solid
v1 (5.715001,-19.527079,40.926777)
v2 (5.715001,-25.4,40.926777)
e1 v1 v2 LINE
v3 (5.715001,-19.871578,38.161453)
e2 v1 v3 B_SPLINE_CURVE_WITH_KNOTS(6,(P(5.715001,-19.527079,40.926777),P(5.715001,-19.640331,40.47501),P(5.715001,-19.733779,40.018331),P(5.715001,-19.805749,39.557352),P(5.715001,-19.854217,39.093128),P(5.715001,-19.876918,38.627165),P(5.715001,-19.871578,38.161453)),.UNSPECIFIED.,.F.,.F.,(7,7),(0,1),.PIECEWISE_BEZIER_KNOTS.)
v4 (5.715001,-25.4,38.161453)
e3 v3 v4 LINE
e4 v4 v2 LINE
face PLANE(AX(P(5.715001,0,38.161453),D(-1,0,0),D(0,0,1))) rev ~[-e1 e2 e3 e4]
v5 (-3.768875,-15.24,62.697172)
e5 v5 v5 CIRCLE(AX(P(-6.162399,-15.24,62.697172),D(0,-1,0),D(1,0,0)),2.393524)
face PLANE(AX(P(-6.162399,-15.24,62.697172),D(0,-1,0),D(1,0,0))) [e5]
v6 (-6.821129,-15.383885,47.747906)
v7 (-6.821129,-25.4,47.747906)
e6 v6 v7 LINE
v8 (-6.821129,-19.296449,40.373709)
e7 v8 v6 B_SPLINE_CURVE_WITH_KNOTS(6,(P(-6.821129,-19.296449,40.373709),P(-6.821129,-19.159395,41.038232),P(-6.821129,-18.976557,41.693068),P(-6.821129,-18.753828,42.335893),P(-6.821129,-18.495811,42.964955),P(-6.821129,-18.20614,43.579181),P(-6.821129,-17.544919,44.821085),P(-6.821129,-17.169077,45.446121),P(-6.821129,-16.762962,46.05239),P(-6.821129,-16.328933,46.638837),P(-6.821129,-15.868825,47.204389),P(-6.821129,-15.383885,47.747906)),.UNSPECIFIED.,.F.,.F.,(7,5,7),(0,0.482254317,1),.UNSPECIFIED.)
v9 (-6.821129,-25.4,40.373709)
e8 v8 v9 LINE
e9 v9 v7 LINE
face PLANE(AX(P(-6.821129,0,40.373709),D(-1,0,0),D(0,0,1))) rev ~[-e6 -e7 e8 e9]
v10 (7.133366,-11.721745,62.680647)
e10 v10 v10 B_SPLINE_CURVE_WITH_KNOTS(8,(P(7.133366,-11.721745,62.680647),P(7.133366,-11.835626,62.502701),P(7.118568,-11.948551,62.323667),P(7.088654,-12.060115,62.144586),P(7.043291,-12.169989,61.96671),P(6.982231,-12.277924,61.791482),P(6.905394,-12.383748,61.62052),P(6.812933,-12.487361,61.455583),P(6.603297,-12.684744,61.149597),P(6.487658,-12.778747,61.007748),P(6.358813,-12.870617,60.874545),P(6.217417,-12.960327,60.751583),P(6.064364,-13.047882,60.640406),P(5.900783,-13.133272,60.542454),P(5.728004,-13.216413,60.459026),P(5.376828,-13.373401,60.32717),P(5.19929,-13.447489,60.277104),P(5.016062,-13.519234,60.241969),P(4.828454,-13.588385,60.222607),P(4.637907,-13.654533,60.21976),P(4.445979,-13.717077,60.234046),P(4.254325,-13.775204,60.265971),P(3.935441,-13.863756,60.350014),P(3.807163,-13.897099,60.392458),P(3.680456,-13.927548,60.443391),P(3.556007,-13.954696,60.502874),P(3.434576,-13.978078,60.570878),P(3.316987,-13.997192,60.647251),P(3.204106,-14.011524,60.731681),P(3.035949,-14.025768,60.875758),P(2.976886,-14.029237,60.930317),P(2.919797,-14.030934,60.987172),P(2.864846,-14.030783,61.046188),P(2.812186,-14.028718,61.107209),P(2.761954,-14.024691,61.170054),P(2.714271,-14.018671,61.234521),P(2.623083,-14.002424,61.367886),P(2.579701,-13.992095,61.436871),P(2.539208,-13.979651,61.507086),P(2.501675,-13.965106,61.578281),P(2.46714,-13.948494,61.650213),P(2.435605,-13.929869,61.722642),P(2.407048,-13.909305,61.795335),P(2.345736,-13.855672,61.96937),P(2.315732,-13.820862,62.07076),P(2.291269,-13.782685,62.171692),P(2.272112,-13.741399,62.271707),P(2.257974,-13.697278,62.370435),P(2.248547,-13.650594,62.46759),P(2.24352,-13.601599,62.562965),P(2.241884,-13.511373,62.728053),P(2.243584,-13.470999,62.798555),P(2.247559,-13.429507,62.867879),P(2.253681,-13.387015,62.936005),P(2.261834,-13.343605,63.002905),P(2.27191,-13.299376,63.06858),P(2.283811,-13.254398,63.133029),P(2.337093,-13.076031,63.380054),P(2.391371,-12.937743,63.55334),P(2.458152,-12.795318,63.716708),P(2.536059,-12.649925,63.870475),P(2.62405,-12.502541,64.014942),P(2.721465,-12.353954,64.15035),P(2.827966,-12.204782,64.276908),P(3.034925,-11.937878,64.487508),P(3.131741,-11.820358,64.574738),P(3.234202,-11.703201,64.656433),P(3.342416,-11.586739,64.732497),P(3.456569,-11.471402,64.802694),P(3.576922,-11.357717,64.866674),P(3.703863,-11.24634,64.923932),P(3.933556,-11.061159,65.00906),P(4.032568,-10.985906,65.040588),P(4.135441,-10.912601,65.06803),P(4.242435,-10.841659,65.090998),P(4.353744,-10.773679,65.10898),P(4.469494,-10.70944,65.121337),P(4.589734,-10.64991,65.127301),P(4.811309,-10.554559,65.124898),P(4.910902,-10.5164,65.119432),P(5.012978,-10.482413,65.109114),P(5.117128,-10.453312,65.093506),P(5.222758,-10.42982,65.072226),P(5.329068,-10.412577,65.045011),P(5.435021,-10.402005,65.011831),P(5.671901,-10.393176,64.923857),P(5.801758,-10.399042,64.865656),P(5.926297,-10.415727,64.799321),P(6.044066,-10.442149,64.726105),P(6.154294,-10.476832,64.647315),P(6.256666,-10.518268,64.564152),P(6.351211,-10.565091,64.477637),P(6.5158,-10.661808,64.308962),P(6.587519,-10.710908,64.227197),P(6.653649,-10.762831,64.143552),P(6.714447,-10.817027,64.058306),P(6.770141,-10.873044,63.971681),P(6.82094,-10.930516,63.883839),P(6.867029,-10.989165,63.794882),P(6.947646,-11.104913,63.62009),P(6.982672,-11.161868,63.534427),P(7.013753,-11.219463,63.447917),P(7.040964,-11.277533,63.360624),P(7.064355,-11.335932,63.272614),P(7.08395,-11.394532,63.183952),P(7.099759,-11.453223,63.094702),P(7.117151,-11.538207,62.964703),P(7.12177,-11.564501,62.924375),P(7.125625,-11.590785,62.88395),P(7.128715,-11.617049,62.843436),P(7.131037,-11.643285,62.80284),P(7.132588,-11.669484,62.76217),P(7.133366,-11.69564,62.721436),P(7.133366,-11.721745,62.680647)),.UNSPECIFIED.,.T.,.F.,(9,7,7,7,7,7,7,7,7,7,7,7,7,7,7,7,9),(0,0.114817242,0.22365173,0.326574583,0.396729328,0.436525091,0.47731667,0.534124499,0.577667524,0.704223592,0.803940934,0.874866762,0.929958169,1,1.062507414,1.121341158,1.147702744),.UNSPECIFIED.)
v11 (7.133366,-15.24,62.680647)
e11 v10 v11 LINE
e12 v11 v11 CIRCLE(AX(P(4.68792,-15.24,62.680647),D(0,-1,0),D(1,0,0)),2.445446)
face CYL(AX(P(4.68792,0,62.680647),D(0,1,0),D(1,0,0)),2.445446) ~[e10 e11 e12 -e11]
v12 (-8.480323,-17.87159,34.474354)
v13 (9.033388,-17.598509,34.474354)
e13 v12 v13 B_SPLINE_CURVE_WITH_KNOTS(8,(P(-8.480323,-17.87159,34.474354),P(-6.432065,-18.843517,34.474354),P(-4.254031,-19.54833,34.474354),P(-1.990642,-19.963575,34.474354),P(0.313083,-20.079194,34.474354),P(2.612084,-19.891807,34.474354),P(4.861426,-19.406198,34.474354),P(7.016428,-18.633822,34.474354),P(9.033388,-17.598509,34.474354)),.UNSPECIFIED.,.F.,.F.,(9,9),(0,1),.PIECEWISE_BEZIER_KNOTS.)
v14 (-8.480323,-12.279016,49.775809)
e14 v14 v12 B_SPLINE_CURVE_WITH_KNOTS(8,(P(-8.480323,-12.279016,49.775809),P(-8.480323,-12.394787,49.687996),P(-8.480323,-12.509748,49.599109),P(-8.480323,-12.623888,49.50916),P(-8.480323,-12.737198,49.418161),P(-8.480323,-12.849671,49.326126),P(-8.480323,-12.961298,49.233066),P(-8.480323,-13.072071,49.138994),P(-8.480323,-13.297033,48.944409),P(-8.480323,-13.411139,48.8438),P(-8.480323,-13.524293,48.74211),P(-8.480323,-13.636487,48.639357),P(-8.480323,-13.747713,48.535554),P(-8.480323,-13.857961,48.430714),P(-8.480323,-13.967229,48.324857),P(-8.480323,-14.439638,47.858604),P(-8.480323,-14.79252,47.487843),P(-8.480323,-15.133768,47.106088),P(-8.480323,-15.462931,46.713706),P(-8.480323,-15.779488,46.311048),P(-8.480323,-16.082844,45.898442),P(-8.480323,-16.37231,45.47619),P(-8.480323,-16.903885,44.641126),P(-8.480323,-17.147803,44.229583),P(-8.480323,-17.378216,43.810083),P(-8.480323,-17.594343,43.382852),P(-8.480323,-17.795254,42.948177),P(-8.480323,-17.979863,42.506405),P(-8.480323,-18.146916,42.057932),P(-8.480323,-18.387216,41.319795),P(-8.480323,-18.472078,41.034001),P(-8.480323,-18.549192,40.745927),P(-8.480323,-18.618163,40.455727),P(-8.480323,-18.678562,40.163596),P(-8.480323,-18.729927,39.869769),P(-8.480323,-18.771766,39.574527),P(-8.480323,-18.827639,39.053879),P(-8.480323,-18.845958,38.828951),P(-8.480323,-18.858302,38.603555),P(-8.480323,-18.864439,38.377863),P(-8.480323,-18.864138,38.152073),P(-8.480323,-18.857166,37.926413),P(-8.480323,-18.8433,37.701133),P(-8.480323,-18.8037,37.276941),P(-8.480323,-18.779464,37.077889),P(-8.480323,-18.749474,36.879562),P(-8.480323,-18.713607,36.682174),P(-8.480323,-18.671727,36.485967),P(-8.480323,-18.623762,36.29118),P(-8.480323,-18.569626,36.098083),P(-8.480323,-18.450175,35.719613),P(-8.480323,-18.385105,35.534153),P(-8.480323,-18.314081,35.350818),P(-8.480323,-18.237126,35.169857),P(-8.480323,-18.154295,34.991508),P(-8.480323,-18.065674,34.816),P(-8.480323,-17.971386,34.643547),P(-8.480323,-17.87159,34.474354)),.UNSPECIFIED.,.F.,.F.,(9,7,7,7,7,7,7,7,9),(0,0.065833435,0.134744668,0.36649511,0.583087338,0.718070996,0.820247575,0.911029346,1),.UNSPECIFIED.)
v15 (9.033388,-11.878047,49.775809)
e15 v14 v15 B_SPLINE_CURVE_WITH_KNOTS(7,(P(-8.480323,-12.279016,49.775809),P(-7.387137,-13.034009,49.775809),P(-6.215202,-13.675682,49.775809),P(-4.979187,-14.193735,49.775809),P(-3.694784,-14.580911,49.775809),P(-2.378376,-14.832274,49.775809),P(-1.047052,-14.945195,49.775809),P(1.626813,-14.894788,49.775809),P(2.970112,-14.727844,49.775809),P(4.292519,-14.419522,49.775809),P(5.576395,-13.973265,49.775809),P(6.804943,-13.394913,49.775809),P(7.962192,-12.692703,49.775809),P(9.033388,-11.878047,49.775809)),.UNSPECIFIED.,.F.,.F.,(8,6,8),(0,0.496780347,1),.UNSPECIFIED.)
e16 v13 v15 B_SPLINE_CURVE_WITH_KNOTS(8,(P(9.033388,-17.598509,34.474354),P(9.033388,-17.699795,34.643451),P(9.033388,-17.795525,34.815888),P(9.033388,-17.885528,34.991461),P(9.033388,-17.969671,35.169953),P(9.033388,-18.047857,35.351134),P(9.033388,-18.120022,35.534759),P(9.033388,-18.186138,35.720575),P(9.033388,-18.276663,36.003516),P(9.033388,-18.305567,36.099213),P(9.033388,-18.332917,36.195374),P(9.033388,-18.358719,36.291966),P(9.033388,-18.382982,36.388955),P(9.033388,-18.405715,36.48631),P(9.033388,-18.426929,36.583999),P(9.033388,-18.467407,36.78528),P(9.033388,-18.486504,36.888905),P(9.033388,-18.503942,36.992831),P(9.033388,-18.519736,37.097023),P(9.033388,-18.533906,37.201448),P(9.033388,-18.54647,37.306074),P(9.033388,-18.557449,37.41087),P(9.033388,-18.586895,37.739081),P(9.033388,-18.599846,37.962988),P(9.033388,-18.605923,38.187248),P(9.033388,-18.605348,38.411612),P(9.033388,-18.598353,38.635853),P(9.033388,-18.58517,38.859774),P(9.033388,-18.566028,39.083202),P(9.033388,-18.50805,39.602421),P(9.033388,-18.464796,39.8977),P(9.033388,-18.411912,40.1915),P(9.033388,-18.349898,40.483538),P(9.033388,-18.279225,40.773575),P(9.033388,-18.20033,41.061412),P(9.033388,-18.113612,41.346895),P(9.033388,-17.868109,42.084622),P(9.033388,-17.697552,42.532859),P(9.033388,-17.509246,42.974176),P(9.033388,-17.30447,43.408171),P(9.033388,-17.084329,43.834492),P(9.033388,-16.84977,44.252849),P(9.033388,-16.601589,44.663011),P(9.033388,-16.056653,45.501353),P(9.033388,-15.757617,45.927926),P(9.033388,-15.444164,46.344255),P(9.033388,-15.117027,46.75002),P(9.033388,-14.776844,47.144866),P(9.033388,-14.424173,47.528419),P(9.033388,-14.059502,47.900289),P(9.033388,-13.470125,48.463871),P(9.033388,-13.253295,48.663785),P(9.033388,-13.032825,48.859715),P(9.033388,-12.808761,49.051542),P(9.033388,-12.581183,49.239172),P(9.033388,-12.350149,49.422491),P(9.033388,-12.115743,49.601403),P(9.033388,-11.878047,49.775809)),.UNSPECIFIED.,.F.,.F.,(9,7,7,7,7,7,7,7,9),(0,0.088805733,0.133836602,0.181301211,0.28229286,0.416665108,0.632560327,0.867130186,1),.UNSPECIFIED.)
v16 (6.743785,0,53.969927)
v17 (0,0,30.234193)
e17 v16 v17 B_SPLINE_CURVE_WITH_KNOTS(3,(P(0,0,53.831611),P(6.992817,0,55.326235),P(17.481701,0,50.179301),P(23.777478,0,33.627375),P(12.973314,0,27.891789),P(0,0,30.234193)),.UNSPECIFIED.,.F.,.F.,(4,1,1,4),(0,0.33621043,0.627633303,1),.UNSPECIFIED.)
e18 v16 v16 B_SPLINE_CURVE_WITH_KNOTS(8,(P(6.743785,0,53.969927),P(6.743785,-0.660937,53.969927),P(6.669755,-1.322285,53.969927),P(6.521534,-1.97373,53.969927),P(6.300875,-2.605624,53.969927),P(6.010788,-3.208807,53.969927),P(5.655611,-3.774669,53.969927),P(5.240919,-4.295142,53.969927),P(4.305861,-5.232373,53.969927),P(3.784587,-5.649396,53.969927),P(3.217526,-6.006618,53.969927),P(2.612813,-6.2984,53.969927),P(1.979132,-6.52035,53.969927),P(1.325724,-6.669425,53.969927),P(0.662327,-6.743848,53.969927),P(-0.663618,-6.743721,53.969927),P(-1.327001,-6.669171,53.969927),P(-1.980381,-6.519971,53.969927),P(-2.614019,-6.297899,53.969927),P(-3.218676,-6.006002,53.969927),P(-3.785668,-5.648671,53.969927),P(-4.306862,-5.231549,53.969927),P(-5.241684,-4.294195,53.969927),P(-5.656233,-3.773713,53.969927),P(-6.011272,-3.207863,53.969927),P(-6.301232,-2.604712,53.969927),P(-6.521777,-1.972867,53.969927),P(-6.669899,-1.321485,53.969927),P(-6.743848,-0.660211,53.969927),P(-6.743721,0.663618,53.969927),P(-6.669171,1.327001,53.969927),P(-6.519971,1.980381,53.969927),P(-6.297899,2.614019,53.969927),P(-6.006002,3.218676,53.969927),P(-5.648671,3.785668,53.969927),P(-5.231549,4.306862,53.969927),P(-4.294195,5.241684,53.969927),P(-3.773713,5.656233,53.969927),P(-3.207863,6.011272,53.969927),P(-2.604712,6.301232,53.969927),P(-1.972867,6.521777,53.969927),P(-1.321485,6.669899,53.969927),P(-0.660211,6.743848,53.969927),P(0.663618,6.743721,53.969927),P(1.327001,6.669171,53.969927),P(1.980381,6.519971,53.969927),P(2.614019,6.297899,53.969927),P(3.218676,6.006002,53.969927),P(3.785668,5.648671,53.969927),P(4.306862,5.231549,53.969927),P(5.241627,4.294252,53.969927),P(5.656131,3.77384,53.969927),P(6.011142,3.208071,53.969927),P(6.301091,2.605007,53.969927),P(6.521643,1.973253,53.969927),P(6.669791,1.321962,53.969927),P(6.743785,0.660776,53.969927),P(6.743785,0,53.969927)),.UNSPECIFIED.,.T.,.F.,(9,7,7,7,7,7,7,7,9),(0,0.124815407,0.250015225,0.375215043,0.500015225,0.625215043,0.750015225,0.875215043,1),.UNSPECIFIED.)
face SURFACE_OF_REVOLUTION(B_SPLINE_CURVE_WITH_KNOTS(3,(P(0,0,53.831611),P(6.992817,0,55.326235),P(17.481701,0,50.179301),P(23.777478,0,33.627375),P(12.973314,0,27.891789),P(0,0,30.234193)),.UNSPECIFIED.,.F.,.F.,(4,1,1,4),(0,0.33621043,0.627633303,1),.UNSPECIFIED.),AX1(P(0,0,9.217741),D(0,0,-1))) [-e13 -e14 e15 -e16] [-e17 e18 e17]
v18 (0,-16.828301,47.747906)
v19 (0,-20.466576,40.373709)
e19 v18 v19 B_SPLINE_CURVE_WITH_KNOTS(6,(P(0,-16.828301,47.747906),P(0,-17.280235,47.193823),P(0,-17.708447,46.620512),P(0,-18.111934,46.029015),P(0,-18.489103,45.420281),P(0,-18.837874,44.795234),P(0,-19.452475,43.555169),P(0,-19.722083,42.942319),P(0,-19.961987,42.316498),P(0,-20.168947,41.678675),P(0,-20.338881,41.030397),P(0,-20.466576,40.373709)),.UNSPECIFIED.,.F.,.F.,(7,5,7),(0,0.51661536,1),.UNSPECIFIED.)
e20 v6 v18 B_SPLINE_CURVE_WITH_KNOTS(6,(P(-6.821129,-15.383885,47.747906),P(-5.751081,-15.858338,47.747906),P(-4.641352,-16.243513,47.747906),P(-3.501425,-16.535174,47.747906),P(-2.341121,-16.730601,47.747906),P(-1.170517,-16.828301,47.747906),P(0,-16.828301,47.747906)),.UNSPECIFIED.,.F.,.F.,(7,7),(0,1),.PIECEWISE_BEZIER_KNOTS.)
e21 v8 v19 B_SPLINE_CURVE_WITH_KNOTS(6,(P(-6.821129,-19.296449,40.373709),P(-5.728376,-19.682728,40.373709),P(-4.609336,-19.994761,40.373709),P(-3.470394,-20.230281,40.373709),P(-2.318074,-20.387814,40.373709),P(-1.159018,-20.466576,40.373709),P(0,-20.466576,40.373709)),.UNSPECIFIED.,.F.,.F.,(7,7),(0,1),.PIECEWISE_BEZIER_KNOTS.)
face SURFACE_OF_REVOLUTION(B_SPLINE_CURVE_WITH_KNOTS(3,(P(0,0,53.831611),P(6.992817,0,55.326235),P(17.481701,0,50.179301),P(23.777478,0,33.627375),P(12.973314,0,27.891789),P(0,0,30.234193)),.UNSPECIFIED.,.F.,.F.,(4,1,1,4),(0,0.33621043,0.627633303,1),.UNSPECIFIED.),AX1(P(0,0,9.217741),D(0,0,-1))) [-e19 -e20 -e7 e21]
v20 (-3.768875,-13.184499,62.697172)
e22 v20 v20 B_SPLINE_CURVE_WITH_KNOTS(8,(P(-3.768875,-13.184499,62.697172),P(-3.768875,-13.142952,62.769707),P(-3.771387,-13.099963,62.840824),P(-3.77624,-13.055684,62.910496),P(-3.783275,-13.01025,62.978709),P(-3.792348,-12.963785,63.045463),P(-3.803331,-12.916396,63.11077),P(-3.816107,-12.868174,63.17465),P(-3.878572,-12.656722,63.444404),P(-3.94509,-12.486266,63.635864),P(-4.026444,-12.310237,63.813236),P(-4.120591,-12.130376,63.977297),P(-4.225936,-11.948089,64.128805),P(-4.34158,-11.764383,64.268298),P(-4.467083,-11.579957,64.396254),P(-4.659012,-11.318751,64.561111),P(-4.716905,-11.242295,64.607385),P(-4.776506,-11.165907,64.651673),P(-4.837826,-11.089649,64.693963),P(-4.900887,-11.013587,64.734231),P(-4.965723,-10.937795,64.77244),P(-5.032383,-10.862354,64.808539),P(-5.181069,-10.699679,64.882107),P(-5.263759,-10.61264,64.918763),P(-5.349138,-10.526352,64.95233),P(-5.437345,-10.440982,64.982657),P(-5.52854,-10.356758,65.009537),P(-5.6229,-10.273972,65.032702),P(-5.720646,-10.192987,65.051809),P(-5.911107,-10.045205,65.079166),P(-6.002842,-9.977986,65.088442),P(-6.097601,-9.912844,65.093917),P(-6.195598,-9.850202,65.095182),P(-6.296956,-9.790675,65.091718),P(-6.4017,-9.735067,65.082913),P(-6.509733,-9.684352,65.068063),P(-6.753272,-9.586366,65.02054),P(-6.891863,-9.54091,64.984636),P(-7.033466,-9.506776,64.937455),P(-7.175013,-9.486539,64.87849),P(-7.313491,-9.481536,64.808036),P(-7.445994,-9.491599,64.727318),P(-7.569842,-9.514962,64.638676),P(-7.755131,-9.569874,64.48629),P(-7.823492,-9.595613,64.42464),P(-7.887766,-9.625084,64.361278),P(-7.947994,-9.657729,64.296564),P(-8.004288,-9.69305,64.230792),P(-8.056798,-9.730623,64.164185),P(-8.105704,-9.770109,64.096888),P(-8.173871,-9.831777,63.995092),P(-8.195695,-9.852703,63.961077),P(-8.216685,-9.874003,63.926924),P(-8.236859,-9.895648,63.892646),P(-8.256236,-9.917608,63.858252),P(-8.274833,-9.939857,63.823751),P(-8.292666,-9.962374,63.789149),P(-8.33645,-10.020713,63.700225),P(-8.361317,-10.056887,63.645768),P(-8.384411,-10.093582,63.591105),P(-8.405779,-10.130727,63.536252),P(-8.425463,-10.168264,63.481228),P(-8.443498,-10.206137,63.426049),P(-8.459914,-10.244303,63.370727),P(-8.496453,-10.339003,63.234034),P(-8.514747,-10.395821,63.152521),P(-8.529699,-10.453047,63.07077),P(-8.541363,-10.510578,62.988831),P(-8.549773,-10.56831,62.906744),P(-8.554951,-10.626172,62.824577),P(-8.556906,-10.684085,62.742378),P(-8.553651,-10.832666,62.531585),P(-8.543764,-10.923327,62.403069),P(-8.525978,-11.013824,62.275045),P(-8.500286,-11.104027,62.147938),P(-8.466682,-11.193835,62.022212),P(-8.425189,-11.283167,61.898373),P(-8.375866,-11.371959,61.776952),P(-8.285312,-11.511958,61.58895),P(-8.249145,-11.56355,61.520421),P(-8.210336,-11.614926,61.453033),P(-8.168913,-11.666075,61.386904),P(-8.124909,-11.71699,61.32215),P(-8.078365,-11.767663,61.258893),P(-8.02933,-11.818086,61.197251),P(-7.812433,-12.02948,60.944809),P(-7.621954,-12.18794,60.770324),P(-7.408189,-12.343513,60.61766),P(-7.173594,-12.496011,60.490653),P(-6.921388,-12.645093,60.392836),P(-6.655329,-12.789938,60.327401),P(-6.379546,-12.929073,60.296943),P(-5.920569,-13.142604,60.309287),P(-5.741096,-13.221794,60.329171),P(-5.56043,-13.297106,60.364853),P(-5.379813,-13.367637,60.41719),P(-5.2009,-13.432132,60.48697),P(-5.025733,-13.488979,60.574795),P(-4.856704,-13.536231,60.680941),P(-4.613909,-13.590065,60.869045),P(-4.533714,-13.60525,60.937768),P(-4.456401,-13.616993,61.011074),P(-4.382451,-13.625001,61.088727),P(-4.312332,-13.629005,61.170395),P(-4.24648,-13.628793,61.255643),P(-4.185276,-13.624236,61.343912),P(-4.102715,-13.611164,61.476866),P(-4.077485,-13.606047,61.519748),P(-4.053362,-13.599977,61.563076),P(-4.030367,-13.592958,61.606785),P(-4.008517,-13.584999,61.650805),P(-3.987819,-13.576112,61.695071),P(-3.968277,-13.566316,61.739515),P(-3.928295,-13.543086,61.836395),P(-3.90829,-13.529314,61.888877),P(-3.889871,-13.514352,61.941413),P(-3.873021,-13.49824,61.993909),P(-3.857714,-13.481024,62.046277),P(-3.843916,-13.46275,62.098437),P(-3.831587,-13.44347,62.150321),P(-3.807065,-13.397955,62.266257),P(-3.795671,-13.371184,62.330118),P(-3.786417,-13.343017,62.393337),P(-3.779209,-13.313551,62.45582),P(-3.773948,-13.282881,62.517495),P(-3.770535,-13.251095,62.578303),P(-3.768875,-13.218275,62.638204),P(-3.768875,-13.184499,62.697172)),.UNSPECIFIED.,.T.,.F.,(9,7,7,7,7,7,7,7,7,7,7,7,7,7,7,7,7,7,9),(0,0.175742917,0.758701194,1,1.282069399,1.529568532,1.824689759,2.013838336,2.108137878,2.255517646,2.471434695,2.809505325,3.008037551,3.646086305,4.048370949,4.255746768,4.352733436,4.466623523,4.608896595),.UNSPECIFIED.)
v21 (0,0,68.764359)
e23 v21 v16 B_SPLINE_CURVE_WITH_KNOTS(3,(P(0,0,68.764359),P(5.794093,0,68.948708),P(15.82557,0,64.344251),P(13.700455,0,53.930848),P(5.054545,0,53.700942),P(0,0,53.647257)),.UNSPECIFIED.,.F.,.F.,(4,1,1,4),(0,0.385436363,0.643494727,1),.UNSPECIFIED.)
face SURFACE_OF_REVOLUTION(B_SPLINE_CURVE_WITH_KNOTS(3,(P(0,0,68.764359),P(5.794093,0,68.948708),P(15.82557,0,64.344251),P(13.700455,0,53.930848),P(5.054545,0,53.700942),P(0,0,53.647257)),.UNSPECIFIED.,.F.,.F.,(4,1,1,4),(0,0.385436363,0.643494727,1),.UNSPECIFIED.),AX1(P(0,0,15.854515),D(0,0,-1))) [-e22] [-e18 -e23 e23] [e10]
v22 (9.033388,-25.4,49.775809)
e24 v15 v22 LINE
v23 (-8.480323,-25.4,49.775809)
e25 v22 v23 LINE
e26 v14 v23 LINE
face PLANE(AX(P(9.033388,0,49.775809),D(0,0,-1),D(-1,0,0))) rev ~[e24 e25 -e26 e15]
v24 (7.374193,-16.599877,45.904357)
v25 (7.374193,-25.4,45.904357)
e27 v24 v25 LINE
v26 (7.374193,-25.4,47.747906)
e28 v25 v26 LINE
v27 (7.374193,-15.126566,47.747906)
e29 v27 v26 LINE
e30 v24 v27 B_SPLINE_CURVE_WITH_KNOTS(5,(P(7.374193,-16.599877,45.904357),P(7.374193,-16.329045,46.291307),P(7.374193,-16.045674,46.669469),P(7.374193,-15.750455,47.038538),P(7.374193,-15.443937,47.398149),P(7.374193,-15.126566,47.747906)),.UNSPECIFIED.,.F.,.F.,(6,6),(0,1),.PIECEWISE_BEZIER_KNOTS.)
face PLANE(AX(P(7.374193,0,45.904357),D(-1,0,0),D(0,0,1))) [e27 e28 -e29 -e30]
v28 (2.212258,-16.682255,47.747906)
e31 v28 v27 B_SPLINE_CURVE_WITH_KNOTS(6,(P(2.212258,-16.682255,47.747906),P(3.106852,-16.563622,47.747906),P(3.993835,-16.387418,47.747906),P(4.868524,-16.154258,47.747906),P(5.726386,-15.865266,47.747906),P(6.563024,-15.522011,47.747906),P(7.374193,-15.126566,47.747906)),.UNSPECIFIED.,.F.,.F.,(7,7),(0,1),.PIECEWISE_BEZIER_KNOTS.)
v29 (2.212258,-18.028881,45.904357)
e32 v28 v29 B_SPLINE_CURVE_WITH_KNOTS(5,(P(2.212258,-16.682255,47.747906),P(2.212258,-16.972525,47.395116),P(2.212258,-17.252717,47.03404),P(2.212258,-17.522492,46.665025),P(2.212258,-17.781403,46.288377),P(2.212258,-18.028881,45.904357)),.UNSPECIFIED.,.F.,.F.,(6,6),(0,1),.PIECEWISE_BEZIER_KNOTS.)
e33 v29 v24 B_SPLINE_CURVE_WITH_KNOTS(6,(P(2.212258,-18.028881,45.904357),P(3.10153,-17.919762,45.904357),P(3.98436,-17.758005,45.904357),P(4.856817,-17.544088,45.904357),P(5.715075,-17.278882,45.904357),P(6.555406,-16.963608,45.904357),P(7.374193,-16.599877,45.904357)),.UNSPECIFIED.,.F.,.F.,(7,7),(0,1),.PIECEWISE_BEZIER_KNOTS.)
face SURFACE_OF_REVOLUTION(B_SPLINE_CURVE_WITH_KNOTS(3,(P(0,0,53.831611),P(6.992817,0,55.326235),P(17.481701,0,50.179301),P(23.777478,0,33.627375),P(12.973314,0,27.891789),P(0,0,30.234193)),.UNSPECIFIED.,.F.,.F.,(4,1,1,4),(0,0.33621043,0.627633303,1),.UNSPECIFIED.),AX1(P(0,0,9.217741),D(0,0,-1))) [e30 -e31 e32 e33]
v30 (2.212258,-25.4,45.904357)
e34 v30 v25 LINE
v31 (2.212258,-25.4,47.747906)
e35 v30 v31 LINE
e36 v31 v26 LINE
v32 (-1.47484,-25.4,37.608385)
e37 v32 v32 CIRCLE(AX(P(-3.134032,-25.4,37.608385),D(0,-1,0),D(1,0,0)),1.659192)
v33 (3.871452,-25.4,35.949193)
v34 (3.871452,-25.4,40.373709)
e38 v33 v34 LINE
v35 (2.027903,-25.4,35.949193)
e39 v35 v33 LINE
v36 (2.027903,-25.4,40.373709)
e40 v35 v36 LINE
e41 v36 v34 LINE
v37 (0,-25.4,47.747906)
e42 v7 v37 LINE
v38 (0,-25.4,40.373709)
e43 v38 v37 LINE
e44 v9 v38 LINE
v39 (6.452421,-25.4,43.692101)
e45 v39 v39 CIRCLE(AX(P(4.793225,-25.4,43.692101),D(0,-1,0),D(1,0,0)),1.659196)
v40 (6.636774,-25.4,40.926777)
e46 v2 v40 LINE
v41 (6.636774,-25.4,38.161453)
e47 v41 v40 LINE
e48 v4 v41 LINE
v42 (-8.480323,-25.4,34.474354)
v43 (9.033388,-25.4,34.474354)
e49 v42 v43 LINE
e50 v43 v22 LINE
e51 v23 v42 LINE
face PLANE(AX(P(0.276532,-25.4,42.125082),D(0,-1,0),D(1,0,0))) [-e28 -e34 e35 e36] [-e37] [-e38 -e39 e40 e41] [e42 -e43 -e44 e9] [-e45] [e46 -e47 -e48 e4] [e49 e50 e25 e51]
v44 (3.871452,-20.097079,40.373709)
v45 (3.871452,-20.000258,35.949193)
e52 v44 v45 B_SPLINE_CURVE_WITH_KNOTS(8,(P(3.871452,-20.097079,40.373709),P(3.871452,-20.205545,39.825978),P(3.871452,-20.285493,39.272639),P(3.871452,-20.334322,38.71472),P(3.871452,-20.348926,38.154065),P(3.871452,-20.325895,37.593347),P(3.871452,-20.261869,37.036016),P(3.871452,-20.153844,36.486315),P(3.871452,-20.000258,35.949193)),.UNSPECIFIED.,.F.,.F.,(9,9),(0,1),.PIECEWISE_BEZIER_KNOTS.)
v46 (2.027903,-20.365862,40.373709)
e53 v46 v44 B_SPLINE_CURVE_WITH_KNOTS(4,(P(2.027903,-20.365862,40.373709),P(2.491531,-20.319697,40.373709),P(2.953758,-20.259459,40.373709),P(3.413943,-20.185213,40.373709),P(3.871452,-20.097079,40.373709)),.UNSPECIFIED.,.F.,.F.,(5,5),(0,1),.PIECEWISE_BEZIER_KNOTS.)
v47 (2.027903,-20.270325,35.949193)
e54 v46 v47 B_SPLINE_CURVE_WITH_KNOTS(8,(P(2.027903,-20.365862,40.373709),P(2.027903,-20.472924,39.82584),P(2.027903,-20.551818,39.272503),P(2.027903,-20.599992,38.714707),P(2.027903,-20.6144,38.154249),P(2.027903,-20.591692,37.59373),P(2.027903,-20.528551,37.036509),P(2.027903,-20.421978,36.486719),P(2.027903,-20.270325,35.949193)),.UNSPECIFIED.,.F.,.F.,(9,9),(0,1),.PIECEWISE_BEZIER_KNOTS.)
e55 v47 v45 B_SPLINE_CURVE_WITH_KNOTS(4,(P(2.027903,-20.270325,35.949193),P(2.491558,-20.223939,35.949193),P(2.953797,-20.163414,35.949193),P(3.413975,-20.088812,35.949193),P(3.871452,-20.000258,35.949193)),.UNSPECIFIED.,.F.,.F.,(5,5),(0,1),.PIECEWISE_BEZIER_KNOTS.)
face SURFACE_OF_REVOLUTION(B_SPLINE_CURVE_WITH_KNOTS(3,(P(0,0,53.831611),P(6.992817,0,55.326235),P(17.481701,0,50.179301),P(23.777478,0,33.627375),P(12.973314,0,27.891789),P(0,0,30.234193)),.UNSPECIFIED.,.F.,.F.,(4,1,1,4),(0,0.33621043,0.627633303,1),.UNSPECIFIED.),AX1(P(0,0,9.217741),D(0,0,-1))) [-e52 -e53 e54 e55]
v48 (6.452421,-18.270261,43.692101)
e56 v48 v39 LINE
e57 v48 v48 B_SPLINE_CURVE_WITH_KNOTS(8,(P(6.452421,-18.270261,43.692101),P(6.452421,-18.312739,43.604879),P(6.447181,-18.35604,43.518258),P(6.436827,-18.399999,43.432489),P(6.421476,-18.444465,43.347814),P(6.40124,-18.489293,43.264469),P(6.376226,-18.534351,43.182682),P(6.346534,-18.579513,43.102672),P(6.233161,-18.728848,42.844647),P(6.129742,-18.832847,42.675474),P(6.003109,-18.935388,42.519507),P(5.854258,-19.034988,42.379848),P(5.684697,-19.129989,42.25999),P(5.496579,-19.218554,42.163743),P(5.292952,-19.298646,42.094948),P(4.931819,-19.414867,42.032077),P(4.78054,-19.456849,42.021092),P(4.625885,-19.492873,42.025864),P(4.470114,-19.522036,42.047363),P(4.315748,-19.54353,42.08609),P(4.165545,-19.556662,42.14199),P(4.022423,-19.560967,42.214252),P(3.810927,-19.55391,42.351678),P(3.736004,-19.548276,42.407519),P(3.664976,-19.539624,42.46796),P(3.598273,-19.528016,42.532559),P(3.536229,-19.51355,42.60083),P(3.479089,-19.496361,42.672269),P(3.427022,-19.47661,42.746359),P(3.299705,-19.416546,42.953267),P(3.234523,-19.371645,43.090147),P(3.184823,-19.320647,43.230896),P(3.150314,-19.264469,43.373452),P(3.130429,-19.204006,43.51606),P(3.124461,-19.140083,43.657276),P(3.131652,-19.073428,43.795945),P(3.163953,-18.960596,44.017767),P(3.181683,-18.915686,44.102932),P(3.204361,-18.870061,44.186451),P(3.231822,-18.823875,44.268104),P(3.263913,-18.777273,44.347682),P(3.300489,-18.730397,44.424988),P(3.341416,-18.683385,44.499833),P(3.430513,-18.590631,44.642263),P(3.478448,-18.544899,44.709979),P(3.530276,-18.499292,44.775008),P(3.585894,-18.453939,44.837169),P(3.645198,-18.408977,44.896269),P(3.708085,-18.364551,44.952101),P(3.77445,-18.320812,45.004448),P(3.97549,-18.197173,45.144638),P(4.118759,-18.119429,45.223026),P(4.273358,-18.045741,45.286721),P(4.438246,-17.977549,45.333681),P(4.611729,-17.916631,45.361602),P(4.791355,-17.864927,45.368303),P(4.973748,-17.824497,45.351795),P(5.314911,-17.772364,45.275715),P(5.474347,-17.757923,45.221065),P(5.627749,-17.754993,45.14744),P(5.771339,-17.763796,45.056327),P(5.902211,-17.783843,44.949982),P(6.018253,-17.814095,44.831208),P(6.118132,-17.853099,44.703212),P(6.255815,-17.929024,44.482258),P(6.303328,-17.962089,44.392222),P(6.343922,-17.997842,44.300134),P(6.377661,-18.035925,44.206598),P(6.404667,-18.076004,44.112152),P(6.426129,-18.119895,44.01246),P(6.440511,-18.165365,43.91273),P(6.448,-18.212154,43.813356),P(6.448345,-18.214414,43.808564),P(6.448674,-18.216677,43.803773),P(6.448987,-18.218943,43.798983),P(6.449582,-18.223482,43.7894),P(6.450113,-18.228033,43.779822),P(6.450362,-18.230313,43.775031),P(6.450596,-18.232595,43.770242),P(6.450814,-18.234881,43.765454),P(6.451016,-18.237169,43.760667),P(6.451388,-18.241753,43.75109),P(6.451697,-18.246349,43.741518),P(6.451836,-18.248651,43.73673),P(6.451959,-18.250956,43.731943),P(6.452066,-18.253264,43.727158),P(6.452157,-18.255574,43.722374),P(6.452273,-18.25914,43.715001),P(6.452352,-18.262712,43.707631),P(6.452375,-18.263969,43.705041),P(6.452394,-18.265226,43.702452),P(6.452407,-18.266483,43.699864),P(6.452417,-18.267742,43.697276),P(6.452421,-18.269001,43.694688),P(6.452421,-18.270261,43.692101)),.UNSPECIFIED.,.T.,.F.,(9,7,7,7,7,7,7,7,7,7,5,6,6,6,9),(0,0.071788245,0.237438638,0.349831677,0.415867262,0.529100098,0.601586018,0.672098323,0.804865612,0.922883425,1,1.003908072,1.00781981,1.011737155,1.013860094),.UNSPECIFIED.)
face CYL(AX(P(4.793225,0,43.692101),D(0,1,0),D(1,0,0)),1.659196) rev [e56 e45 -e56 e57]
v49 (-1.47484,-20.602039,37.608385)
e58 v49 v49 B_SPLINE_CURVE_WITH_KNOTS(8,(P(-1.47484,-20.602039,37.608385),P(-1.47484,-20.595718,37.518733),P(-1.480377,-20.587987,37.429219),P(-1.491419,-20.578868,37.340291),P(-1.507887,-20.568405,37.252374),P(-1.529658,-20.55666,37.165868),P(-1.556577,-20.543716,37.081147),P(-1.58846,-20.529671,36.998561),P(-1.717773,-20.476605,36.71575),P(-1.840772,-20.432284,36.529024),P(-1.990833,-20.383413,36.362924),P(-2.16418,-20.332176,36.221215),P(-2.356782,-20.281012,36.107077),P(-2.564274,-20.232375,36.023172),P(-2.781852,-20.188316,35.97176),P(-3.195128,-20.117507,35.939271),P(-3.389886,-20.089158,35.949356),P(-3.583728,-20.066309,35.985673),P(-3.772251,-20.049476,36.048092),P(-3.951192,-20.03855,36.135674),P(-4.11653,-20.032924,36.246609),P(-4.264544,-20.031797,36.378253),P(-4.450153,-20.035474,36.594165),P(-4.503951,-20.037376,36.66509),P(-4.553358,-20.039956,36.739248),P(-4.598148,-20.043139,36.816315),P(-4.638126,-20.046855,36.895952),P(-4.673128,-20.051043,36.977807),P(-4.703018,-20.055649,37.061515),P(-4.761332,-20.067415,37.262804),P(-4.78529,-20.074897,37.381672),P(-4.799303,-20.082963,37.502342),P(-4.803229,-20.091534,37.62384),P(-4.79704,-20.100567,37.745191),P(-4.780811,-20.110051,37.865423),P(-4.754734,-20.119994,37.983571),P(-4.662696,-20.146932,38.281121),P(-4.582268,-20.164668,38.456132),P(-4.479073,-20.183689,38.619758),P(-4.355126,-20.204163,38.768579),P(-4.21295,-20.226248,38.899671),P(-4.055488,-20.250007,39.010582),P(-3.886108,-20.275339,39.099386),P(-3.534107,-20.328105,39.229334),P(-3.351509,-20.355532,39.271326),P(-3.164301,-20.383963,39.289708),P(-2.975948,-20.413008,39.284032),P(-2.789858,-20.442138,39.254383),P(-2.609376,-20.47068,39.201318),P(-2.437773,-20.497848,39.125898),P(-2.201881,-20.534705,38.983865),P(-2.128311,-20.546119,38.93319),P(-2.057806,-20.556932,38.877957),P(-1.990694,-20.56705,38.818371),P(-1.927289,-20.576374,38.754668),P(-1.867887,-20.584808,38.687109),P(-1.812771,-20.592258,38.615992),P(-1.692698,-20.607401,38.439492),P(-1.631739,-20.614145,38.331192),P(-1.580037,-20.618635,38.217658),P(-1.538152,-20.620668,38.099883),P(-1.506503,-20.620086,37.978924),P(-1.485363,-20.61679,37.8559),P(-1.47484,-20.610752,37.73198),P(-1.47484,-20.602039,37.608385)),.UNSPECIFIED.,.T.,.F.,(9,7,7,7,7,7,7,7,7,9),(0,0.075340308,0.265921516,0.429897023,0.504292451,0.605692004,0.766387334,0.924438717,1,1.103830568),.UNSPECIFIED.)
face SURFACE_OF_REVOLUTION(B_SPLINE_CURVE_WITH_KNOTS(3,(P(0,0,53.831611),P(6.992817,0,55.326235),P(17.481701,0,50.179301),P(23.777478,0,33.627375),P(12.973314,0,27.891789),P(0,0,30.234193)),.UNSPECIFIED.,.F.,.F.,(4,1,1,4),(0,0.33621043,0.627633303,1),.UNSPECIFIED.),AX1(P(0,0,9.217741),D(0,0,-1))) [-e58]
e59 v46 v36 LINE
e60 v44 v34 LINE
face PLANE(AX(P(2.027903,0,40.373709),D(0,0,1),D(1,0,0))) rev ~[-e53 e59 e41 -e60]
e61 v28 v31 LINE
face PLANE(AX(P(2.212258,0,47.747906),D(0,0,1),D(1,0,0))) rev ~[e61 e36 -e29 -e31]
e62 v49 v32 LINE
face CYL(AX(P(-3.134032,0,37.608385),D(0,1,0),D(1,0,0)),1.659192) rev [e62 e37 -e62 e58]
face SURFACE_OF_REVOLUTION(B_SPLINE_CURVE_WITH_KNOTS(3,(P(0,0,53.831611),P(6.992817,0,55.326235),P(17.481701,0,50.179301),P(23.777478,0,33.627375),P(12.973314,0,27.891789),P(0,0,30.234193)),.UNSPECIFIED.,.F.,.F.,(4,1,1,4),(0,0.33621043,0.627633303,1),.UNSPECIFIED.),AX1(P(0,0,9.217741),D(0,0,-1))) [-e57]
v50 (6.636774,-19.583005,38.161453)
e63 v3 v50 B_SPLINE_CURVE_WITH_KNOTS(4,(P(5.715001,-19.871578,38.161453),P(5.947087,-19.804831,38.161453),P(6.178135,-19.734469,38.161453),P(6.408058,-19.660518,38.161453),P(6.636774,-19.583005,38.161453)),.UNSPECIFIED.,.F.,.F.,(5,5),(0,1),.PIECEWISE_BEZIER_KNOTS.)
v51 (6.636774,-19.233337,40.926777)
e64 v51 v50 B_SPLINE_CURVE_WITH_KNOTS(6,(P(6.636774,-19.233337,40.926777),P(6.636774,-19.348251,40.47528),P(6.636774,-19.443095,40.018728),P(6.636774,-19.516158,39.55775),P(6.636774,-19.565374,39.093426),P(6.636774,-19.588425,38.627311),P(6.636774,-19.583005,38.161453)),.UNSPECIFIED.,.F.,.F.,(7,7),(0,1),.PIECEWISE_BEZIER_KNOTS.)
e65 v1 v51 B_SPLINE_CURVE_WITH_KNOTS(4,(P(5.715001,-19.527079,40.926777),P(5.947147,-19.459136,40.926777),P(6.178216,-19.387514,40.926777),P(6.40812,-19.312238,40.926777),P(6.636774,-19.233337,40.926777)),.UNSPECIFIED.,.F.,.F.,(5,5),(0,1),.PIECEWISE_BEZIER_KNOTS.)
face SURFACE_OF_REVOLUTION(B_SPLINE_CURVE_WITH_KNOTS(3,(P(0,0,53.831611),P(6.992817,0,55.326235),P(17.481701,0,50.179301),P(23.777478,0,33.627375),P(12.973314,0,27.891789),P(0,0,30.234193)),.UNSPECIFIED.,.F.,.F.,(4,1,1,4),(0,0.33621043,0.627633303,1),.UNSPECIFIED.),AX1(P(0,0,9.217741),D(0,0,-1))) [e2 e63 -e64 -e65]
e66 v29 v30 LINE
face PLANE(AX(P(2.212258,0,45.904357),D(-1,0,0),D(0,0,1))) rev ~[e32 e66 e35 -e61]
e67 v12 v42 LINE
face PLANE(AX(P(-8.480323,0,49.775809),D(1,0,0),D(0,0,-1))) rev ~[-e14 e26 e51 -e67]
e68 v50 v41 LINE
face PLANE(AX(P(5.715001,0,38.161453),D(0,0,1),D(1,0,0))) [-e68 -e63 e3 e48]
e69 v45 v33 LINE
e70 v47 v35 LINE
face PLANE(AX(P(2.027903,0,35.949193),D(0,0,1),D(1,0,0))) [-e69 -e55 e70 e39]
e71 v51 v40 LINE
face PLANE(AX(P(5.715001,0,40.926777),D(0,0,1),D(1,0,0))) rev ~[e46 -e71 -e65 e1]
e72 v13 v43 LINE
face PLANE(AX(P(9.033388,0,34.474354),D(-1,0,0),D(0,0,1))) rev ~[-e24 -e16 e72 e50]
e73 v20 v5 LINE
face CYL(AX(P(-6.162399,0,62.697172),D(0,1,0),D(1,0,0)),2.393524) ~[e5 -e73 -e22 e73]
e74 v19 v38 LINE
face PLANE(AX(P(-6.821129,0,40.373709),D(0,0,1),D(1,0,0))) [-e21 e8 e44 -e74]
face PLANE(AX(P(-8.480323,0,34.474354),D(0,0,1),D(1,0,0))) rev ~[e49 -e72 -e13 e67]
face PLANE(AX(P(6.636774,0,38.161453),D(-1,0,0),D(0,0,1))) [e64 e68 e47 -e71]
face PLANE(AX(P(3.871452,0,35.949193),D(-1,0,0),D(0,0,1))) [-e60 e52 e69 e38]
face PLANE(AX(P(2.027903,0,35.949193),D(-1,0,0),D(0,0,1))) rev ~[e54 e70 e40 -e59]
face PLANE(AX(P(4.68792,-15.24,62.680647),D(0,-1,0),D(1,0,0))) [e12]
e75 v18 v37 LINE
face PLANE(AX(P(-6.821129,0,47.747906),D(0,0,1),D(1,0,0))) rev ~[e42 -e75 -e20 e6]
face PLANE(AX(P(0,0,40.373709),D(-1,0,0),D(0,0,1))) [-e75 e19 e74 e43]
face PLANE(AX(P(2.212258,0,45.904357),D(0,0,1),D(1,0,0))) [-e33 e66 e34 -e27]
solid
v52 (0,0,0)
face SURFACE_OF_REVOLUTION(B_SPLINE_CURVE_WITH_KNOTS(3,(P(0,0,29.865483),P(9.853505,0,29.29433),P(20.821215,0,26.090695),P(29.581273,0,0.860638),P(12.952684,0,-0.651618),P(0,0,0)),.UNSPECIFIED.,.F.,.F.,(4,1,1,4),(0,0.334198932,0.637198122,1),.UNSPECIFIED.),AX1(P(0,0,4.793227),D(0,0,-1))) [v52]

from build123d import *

# Parameters (mm, degrees)
F6_R     = 2.3935238265
F6_R_2   = 2.4454458433
F7_DEPTH = 15.24
F8_R     = 1.6591921449
F8_W     = 1.843548147
F8_H     = 4.4245161116
F8_W_2   = 0.9217732586
F8_H_2   = 2.7653239667
F8_W_3   = 6.8211294711
F8_H_3   = 7.3741972446
F8_R_2   = 1.6591958702
F8_W_4   = 5.1619342994
F8_H_4   = 1.8435493112
F9_DEPTH = 25.4


# Not quite as in the source:
# - the program builds the solid bodies; features that only make, move or delete a surface that nothing else refers to are left out


with BuildPart() as f1:
    # F0 (on Front) → F1 (revolve)
    with BuildSketch(Plane.XZ):
        with BuildLine():
            add(Edge.make_bspline(
                [(0, 29.8654828221), (9.8535054473, 29.2943295833), (20.8212154261, 26.0906949961), (29.5812727595, 0.8606382631), (12.9526836251, -0.6516184138), (0, 0)],
                knots=[0, 0, 0, 0, 0.3341989325, 0.6371981217, 1, 1, 1, 1], degree=3))
            Line((0, 29.8654828221), (0, 0))
        make_face()
    revolve(axis=Axis((0, 0, 4.7932267189), (0, 0, -1)))


with BuildPart() as f3:
    # F2 (on Front) → F3 (revolve)
    with BuildSketch(Plane.XZ):
        with BuildLine():
            add(Edge.make_bspline(
                [(0, 53.8316108286), (6.9928166701, 55.3262349055), (17.4817013102, 50.1793012041), (23.7774783446, 33.6273746897), (12.9733139144, 27.8917889087), (0, 30.2341934294)],
                knots=[0, 0, 0, 0, 0.3362104295, 0.6276333026, 1, 1, 1, 1], degree=3))
            Line((0, 53.8316108286), (0, 30.2341934294))
        make_face()
    revolve(axis=Axis((0, 0, 9.2177409679), (0, 0, -1)))

    # F4 (on Front) → F5 (revolve)
    with BuildSketch(Plane.XZ):
        with BuildLine():
            add(Edge.make_bspline(
                [(0, 68.7643587589), (5.7940934785, 68.9487084746), (15.8255702308, 64.3442509018), (13.700454757, 53.9308476818), (5.0545447701, 53.7009421683), (0, 53.6472573876)],
                knots=[0, 0, 0, 0, 0.3854363626, 0.6434947274, 1, 1, 1, 1], degree=3))
            Line((0, 68.7643587589), (0, 53.6472573876))
        make_face()
    revolve(axis=Axis((0, 0, 15.8545151353), (0, 0, -1)))

    # F6 (on Front) → F7 (join)
    with BuildSketch(Plane.XZ):
        with Locations((-6.1623989604, 62.6971721649)):
            Circle(F6_R)
        with Locations((4.6879197471, 62.6806467772)):
            Circle(F6_R_2)
    extrude(amount=F7_DEPTH)

    # F8 (on Front) → F9 (join)
    with BuildSketch(Plane.XZ):
        Polygon((9.0333875269, 49.7758090496), (-8.4803225473, 49.7758090496), (-8.4803225473, 37.6083850861), (-8.4803225473, 34.4743542373), (9.0333875269, 34.4743542373), align=None)
        with BuildLine():
            ThreePointArc((-5.1619373262, 37.6083850861), (-6.8211294711, 35.9491929412), (-8.4803216159, 37.6083850861))
            ThreePointArc((-8.4803216159, 37.6083850861), (-6.8211294711, 39.2675772309), (-5.1619373262, 37.6083850861))
        make_face(mode=Mode.SUBTRACT)
        with Locations((-3.1340324786, 37.6083850861)):
            Circle(F8_R, mode=Mode.SUBTRACT)
        with Locations((2.9496775242, 38.161450997)):
            Rectangle(F8_W, F8_H, mode=Mode.SUBTRACT)
        with Locations((6.1758875381, 39.544114843)):
            Rectangle(F8_W_2, F8_H_2, mode=Mode.SUBTRACT)
        with Locations((-3.4105647355, 44.0608076751)):
            Rectangle(F8_W_3, F8_H_3, mode=Mode.SUBTRACT)
        with Locations((4.7932254383, 43.6921007931)):
            Circle(F8_R_2, mode=Mode.SUBTRACT)
        with Locations((4.7932254383, 46.8261316419)):
            Rectangle(F8_W_4, F8_H_4, mode=Mode.SUBTRACT)
        with BuildLine():
            ThreePointArc((-5.1619373262, 37.6083850861), (-6.8211294711, 39.2675772309), (-8.4803216159, 37.6083850861))
            ThreePointArc((-8.4803216159, 37.6083850861), (-6.8211294711, 35.9491929412), (-5.1619373262, 37.6083850861))
        make_face()
    extrude(amount=F9_DEPTH)


solid = Compound([f1.part, f3.part])
